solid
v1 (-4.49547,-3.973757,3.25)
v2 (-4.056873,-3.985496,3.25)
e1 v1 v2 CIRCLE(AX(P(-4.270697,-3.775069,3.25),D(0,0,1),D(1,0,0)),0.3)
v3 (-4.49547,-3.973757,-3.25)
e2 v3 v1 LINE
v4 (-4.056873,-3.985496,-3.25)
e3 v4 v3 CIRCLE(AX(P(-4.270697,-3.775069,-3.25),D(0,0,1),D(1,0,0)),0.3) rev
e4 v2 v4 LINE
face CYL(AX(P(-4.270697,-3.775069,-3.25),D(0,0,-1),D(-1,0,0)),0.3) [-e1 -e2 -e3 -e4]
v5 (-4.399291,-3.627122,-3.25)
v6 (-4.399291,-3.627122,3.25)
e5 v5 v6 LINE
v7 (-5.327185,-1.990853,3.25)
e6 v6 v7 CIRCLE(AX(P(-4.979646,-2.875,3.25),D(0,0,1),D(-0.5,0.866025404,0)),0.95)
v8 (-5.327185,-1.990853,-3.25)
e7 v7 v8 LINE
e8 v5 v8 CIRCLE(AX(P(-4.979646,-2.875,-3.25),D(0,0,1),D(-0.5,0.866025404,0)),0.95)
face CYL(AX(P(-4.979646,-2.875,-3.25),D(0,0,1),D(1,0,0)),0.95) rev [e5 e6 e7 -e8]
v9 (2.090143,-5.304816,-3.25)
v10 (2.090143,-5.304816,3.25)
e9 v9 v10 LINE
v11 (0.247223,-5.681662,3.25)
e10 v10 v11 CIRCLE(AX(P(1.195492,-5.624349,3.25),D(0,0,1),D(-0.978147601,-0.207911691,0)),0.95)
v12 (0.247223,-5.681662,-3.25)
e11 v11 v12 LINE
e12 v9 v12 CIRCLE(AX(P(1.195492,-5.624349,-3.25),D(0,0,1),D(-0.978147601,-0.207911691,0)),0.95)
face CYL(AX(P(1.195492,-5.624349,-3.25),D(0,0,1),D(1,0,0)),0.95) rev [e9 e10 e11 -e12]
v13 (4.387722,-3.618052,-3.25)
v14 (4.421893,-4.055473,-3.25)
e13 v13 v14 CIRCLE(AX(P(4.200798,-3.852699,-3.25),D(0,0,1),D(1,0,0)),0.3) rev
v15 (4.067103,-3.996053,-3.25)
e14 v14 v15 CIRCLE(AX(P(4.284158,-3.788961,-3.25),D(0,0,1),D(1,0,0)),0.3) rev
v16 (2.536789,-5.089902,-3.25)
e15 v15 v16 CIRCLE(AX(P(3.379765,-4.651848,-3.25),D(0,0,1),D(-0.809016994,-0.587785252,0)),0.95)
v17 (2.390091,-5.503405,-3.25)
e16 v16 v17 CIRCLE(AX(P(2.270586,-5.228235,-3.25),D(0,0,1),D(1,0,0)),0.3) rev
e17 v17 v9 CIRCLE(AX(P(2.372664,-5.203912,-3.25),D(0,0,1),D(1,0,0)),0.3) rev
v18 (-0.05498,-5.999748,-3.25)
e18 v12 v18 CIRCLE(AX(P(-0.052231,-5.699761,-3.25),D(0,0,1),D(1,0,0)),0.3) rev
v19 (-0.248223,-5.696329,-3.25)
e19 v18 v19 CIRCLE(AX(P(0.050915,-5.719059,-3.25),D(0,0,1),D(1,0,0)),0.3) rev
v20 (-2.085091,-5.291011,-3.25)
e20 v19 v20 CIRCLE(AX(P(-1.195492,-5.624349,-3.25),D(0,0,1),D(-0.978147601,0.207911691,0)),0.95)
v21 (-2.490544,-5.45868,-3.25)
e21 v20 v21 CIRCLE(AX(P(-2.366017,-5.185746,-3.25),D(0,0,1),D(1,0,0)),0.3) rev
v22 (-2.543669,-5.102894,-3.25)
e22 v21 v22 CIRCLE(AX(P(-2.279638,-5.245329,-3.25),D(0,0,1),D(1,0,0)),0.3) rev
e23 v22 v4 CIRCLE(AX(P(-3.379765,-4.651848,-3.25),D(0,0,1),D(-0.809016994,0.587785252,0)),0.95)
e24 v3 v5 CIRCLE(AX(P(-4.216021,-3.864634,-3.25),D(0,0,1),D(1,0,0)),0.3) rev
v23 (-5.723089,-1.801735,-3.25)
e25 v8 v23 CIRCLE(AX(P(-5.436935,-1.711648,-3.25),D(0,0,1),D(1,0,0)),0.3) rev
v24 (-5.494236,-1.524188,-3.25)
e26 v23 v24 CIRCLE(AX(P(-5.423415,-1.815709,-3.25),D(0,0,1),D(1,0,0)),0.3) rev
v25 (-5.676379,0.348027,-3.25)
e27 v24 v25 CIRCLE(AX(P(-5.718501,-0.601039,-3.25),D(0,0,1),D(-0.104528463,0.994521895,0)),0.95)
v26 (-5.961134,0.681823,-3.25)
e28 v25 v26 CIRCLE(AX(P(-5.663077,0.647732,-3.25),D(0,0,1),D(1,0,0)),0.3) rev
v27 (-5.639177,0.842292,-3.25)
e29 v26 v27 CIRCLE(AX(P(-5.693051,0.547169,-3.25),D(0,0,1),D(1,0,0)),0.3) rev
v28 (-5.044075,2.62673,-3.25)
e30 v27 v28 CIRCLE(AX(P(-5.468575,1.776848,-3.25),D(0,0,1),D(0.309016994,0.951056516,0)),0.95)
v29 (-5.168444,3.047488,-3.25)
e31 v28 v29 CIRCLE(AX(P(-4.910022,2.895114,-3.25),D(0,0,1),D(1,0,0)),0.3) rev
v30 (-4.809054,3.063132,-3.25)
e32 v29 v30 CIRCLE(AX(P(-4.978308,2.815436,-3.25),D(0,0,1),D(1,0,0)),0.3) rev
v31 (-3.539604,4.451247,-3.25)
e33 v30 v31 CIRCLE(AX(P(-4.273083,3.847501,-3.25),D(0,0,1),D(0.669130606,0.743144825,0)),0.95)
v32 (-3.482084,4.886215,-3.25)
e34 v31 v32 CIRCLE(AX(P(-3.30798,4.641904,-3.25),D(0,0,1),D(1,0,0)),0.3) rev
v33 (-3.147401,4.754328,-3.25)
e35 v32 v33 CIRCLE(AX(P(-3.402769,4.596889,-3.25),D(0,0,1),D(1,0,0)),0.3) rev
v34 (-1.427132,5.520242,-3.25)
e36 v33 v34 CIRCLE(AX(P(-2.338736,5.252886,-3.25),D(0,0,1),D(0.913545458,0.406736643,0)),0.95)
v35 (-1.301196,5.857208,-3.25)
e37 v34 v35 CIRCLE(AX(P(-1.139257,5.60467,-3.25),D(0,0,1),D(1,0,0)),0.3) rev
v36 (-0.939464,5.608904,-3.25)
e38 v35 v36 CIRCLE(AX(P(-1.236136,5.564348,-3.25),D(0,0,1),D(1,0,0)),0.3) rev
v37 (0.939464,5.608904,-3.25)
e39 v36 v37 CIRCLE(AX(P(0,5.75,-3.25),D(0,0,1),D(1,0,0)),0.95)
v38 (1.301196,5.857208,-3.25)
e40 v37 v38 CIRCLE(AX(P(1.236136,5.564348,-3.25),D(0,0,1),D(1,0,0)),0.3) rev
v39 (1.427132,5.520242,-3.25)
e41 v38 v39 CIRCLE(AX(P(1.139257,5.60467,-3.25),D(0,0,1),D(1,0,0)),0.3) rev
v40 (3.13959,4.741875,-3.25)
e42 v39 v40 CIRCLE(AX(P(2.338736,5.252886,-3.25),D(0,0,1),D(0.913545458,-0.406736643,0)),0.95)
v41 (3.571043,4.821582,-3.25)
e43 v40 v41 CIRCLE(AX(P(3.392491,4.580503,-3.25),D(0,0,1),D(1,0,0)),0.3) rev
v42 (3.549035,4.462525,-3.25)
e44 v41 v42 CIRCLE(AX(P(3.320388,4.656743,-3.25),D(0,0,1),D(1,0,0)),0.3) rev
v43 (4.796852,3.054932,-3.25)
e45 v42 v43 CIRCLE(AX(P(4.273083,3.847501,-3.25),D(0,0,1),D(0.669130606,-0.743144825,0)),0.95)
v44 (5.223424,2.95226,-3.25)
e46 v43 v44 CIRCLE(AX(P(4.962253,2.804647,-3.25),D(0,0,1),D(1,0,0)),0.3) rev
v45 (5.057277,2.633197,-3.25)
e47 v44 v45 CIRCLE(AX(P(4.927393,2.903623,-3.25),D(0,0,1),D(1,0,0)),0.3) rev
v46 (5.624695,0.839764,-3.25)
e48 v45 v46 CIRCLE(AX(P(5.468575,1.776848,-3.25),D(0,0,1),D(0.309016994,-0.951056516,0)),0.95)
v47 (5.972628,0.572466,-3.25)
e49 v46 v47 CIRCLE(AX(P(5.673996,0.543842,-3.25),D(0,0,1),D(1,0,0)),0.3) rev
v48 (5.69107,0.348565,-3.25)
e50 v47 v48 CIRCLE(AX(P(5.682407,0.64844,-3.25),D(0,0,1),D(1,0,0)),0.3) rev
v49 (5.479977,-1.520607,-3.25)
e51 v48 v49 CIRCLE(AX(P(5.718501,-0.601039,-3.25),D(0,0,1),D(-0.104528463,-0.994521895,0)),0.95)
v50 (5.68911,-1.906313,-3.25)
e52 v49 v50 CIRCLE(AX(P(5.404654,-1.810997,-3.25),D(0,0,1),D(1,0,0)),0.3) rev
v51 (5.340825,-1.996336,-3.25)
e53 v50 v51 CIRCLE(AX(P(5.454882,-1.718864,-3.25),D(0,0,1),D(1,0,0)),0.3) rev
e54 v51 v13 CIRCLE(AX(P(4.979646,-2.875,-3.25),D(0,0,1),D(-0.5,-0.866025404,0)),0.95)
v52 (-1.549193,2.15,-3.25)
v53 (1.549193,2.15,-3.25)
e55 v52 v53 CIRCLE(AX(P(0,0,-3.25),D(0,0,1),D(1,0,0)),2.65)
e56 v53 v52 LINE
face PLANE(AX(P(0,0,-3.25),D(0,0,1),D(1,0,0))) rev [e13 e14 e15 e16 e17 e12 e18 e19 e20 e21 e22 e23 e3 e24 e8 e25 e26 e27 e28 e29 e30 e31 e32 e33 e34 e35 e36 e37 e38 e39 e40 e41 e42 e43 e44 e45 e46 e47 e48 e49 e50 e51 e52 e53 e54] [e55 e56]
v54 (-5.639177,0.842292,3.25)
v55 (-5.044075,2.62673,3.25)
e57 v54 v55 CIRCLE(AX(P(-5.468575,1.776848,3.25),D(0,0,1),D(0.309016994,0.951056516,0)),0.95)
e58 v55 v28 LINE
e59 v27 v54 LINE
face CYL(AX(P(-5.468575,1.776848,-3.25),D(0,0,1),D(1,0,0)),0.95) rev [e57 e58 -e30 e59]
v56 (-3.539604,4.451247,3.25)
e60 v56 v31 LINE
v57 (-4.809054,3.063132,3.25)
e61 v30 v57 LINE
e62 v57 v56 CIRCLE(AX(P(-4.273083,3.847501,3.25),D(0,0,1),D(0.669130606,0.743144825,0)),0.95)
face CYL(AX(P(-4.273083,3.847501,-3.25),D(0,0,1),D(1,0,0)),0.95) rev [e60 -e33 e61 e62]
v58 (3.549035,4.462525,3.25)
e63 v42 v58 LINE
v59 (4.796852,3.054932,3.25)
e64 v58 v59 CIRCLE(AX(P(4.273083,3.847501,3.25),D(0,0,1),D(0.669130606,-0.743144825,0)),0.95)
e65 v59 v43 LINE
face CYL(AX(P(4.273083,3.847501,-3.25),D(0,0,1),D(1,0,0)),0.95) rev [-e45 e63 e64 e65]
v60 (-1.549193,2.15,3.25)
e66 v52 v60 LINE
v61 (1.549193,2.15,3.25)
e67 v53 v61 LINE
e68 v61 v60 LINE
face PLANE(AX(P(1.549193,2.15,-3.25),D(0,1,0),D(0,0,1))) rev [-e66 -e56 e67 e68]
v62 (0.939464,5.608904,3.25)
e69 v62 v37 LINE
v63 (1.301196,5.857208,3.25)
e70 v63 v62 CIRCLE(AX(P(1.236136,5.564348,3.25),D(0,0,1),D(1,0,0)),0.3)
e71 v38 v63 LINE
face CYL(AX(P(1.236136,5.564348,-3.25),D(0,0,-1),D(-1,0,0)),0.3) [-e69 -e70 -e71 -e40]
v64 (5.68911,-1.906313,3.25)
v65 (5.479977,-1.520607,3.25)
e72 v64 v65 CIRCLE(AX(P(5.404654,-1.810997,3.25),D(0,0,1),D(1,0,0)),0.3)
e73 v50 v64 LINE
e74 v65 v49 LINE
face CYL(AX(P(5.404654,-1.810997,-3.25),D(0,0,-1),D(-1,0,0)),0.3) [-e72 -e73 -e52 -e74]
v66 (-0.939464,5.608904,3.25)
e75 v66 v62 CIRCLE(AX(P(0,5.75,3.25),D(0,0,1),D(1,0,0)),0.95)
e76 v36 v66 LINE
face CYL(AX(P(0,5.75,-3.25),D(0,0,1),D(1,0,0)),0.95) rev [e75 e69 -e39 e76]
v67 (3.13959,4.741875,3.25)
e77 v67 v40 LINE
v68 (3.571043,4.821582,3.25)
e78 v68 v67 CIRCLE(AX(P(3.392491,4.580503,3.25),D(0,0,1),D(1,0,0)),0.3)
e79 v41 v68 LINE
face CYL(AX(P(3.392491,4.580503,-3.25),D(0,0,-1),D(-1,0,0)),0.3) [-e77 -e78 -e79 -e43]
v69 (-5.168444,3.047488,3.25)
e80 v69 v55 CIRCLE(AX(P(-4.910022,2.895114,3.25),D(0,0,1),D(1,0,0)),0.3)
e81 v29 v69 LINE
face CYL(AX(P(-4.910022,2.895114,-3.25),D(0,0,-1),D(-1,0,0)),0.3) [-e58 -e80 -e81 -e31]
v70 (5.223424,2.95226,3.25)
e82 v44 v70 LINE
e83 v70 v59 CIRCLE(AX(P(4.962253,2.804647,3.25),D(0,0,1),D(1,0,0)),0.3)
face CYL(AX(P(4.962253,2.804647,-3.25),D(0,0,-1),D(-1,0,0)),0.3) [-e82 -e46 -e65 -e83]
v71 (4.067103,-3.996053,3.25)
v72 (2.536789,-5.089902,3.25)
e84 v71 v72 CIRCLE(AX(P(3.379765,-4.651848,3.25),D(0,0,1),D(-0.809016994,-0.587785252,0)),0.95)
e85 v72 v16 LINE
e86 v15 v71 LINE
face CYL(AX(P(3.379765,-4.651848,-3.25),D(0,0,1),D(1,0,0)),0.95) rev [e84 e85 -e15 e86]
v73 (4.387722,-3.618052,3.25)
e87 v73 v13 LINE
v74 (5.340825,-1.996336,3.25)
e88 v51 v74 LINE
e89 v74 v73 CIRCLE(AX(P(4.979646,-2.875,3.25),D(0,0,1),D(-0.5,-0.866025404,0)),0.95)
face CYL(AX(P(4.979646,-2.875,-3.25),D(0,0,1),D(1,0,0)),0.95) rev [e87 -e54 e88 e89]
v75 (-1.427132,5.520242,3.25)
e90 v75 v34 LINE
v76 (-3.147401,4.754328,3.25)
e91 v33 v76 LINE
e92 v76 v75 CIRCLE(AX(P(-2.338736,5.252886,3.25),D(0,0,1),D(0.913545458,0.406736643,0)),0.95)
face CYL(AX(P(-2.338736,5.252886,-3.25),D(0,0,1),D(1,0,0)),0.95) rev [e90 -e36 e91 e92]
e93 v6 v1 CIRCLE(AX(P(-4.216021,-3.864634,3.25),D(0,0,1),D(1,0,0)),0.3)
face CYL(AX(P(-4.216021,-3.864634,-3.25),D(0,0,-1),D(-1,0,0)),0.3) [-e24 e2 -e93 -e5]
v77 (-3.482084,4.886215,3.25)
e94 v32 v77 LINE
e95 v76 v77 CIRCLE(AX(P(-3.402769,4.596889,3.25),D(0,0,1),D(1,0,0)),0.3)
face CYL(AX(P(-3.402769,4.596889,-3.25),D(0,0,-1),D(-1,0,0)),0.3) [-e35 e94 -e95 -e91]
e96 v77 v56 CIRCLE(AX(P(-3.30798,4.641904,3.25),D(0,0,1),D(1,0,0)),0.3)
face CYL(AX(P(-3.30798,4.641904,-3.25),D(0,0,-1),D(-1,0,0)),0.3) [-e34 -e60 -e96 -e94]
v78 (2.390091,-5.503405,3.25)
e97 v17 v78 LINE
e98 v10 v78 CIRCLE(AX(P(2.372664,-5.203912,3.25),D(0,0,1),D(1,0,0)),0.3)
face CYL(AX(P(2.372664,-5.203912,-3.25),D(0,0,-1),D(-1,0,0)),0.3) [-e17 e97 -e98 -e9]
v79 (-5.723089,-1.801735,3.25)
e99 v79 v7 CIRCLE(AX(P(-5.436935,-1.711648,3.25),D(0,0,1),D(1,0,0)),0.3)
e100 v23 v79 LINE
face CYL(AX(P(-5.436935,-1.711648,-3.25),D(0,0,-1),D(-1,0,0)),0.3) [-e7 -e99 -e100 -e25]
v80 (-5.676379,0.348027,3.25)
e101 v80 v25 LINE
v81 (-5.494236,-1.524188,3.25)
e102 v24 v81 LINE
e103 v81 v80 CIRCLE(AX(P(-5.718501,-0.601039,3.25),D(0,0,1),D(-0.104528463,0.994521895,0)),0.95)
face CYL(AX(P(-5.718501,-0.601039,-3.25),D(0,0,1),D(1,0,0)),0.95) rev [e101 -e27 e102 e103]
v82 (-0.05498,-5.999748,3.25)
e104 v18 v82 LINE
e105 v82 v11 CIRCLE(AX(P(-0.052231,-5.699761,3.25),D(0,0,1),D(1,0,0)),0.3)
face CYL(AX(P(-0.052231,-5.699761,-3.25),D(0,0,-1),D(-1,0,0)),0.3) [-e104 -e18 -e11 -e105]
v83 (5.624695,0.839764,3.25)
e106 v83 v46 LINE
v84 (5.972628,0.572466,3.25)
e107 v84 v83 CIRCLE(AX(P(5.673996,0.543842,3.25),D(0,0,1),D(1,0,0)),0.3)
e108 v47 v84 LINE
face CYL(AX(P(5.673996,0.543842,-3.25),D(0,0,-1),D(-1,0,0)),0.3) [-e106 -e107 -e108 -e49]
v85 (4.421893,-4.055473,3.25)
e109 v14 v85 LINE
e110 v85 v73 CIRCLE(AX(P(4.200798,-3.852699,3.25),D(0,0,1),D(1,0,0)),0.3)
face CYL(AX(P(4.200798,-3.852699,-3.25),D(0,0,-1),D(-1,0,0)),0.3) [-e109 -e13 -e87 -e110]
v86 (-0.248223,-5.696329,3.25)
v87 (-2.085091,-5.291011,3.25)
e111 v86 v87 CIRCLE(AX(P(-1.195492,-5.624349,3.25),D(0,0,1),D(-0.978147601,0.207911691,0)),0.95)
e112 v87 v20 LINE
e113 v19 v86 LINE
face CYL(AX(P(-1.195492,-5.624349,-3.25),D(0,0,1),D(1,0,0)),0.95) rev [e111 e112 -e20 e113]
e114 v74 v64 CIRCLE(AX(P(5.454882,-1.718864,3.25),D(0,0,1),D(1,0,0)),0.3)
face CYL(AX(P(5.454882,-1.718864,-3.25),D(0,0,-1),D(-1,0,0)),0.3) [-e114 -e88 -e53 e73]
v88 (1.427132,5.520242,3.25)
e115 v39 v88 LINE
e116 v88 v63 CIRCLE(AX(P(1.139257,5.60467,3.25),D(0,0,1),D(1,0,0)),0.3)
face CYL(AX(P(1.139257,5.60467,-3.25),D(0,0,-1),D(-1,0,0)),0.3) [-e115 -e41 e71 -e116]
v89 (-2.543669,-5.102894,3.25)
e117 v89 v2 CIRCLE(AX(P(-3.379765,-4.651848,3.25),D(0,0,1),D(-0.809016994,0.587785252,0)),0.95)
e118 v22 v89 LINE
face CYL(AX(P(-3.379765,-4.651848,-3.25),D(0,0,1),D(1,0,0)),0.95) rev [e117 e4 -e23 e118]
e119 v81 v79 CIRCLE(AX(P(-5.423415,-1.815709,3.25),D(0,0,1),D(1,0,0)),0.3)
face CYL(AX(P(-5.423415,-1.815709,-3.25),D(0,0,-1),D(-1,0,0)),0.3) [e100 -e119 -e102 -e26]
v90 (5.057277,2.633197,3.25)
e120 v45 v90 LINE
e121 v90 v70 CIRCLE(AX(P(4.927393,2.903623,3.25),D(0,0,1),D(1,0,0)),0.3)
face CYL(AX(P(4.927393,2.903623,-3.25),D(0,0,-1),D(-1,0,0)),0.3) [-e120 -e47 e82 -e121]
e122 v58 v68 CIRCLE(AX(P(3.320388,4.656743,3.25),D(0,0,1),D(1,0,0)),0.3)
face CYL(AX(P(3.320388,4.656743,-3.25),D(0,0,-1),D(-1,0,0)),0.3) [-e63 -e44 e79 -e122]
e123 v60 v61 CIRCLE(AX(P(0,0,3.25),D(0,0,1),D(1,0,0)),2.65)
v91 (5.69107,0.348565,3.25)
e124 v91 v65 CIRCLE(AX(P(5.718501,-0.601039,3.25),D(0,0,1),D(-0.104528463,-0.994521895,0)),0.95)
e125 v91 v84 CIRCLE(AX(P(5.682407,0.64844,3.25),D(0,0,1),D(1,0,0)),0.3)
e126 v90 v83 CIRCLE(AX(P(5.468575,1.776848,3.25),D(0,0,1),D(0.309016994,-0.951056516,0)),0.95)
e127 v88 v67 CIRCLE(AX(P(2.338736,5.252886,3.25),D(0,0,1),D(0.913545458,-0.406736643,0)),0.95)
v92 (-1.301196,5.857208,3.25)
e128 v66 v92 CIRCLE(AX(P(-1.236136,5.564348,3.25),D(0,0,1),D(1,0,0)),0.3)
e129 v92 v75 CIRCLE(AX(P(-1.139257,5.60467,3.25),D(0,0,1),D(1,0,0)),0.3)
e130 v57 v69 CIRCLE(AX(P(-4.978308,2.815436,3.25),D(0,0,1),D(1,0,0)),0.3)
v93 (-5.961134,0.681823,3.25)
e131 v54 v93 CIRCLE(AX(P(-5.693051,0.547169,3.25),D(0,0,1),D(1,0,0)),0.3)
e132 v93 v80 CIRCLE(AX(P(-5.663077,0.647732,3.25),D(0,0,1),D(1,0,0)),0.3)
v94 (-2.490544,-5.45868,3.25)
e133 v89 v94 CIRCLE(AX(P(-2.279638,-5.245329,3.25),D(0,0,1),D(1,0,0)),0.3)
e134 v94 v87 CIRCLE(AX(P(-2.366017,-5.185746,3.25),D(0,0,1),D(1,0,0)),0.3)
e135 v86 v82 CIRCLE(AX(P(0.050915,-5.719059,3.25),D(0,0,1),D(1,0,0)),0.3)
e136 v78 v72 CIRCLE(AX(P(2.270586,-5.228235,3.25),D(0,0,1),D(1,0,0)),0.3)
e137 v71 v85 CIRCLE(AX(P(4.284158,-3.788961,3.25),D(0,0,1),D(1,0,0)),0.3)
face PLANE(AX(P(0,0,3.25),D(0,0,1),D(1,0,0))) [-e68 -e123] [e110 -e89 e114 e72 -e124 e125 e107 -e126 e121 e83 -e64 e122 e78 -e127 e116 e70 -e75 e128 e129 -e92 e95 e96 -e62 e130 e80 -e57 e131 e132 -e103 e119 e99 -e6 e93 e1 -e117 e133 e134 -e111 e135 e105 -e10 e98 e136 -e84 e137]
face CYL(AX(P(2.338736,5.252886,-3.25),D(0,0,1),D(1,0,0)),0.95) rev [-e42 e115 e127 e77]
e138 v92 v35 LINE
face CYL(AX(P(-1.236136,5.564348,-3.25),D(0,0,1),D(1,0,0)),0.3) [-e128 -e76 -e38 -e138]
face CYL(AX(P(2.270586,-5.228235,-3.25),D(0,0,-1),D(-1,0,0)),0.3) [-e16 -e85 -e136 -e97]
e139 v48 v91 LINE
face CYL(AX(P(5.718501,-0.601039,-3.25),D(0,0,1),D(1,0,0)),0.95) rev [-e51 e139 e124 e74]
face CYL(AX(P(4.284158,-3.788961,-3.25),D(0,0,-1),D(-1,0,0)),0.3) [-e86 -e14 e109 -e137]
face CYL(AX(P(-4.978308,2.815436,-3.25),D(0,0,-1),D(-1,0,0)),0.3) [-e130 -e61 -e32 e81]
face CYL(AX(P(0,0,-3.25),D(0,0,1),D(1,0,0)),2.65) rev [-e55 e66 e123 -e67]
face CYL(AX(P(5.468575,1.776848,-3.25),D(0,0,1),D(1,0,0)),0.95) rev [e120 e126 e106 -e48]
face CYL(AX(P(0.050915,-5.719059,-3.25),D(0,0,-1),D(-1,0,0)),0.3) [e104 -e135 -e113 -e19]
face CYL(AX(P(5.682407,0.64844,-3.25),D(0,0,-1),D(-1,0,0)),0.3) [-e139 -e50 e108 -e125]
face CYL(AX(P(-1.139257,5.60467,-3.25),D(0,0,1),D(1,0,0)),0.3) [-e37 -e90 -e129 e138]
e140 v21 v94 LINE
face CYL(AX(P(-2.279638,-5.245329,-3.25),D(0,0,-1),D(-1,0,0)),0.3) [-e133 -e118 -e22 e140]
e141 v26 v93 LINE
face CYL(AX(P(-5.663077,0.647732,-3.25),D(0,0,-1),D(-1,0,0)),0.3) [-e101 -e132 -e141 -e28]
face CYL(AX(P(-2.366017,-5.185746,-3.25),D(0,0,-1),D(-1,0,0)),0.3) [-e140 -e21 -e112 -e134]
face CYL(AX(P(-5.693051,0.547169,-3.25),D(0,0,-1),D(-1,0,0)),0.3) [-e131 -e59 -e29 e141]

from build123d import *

# Parameters (mm, degrees)
SKIZZE1_R                            = 6
AUFSATZ_LINEAR_AUSTRAGEN1_DEPTH      = 3.25
SCHNITT_LINEAR_AUSTRAGEN1_DEPTH      = 10.086390923
VERRUNDUNG2_R                        = 0.3
KREISMUSTER1_START                   = -3.25
KREISMUSTER1_DEPTH                   = 6.5
SCHNITT_LINEAR_AUSTRAGEN2_DEPTH      = 10.068181427
SCHNITT_LINEAR_AUSTRAGEN2_DEPTH_BACK = 10.068181427


# Read off the part's stored shape, not the designer's step: Kreismuster1
with BuildPart() as part:
    # Skizze1 → Aufsatz-Linear austragen1 (new, symmetric)
    with BuildSketch(Plane.XY):
        with Locations(Location((0, 0, 0), (0, 0, 180))):
            Circle(SKIZZE1_R)
    extrude(amount=AUFSATZ_LINEAR_AUSTRAGEN1_DEPTH, both=True)

    # Skizze2 → Schnitt-Linear austragen1 (cut, symmetric)
    with BuildSketch(Plane.XY):
        with BuildLine():
            Line((0.95, 5.75), (0.95, 6))
            Line((0.95, 6), (-0.95, 6))
            Line((-0.95, 6), (-0.95, 5.75))
            ThreePointArc((-0.95, 5.75), (0, 4.8), (0.95, 5.75))
        make_face()
    extrude(amount=SCHNITT_LINEAR_AUSTRAGEN1_DEPTH, both=True, mode=Mode.SUBTRACT)

    # Verrundung2
    verrundung2_edges = [part.edges().sort_by_distance(p)[0] for p in [
        (0.95, 5.924314306, 0),
        (-0.95, 5.924314306, 0),
    ]]
    fillet(verrundung2_edges, radius=VERRUNDUNG2_R)

    # Kreismuster1 outline → Kreismuster1 (cut)
    with BuildSketch(Plane.XY.offset(KREISMUSTER1_START)):
        with BuildLine():
            ThreePointArc((1.301196241, 5.857208238), (1.4202728, 5.709694635), (1.427132072, 5.520241632))
            ThreePointArc((1.427132072, 5.520241632), (1.945632522, 4.388033855), (3.139589709, 4.741874783))
            ThreePointArc((3.139589709, 4.741874783), (3.337990982, 4.875510752), (3.571043132, 4.821581789))
            ThreePointArc((3.571043132, 4.821581789), (2.49054405, 5.458680274), (1.301196241, 5.857208238))
        make_face()
        with BuildLine():
            ThreePointArc((-1.301196241, 5.857208238), (-2.440419859, 5.481272746), (-3.482083764, 4.886214553))
            ThreePointArc((-3.482083764, 4.886214553), (-3.292782023, 4.875999815), (-3.147401255, 4.754328445))
            ThreePointArc((-3.147401255, 4.754328445), (-1.952335887, 4.385018197), (-1.427132072, 5.520241632))
            ThreePointArc((-1.427132072, 5.520241632), (-1.4202728, 5.709694635), (-1.301196241, 5.857208238))
        make_face()
        with BuildLine():
            ThreePointArc((-3.482083764, 4.886214553), (-4.421893009, 4.055473119), (-5.168444311, 3.047488049))
            ThreePointArc((-5.168444311, 3.047488049), (-4.991353857, 3.115152376), (-4.809053712, 3.063131734))
            ThreePointArc((-4.809053712, 3.063131734), (-3.572034677, 3.206383521), (-3.539604337, 4.451247144))
            ThreePointArc((-3.539604337, 4.451247144), (-3.60539033, 4.681233753), (-3.482083764, 4.886214553))
        make_face()
        with BuildLine():
            ThreePointArc((-5.168444311, 3.047488049), (-5.689109795, 1.906313128), (-5.961133882, 0.681823175))
            ThreePointArc((-5.961133882, 0.681823175), (-5.826875264, 0.815666791), (-5.639177093, 0.842291719))
            ThreePointArc((-5.639177093, 0.842291719), (-4.567369724, 1.476299708), (-5.044074785, 2.626729824))
            ThreePointArc((-5.044074785, 2.626729824), (-5.197717262, 2.810075472), (-5.168444311, 3.047488049))
        make_face()
        with BuildLine():
            ThreePointArc((-5.961133882, 0.681823175), (-5.972627813, -0.572465721), (-5.72308925, -1.801735119))
            ThreePointArc((-5.72308925, -1.801735119), (-5.654877001, -1.624854993), (-5.494235524, -1.524188187))
            ThreePointArc((-5.494235524, -1.524188187), (-4.772965052, -0.509049737), (-5.676378878, 0.348027053))
            ThreePointArc((-5.676378878, 0.348027053), (-5.891311659, 0.453029612), (-5.961133882, 0.681823175))
        make_face()
        with BuildLine():
            ThreePointArc((-5.72308925, -1.801735119), (-5.223424224, -2.952260046), (-4.495470494, -3.973757043))
            ThreePointArc((-4.495470494, -3.973757043), (-4.505099133, -3.784424586), (-4.39929072, -3.627122108))
            ThreePointArc((-4.39929072, -3.627122108), (-4.153271361, -2.406379857), (-5.327185496, -1.990852756))
            ThreePointArc((-5.327185496, -1.990852756), (-5.566244749, -1.982349183), (-5.72308925, -1.801735119))
        make_face()
        with BuildLine():
            ThreePointArc((-4.495470494, -3.973757043), (-3.571043132, -4.821581789), (-2.490544049, -5.458680274))
            ThreePointArc((-2.490544049, -5.458680274), (-2.576348697, -5.289632788), (-2.543668584, -5.102893665))
            ThreePointArc((-2.543668584, -5.102893665), (-2.815439322, -3.887625039), (-4.056873345, -3.985496038))
            ThreePointArc((-4.056873345, -3.985496038), (-4.278723555, -4.074961795), (-4.495470494, -3.973757043))
        make_face()
        with BuildLine():
            ThreePointArc((-2.490544049, -5.458680274), (-1.301196241, -5.857208238), (-0.054979913, -5.999748095))
            ThreePointArc((-0.054979913, -5.999748095), (-0.202124166, -5.880215427), (-0.248223041, -5.69632855))
            ThreePointArc((-0.248223041, -5.69632855), (-0.990792245, -4.696664534), (-2.085090937, -5.291010847))
            ThreePointArc((-2.085090937, -5.291010847), (-2.251372186, -5.462976493), (-2.490544049, -5.458680274))
        make_face()
        with BuildLine():
            ThreePointArc((-0.054979913, -5.999748095), (1.193639301, -5.880070171), (2.39009075, -5.503404965))
            ThreePointArc((2.39009075, -5.503404965), (2.20704947, -5.454055398), (2.090142521, -5.304816478))
            ThreePointArc((2.090142521, -5.304816478), (1.005171811, -4.693608063), (0.247222636, -5.681661814))
            ThreePointArc((0.247222636, -5.681661814), (0.165261886, -5.906392926), (-0.054979913, -5.999748095))
        make_face()
        with BuildLine():
            ThreePointArc((2.39009075, -5.503404965), (3.482083764, -4.886214553), (4.421893009, -4.055473119))
            ThreePointArc((4.421893009, -4.055473119), (4.234604202, -4.084839642), (4.067103452, -3.996053445))
            ThreePointArc((4.067103452, -3.996053445), (2.82733253, -3.878984118), (2.53678917, -5.089901837))
            ThreePointArc((2.53678917, -5.089901837), (2.553320677, -5.328540364), (2.39009075, -5.503404965))
        make_face()
        with BuildLine():
            ThreePointArc((4.421893009, -4.055473119), (5.168444311, -3.047488049), (5.689109795, -1.906313128))
            ThreePointArc((5.689109795, -1.906313128), (5.529957397, -2.009318003), (5.340825248, -1.996336468))
            ThreePointArc((5.340825248, -1.996336468), (4.160621768, -2.393648579), (4.38772181, -3.618051592))
            ThreePointArc((4.38772181, -3.618051592), (4.499887126, -3.829334765), (4.421893009, -4.055473119))
        make_face()
        with BuildLine():
            ThreePointArc((5.689109795, -1.906313128), (5.961133882, -0.681823176), (5.972627814, 0.572465721))
            ThreePointArc((5.972627814, 0.572465721), (5.86913072, 0.413632974), (5.691069839, 0.34856522))
            ThreePointArc((5.691069839, 0.34856522), (4.774501705, -0.494429456), (5.479977488, -1.520607358))
            ThreePointArc((5.479977488, -1.520607358), (5.668382211, -1.668002397), (5.689109795, -1.906313128))
        make_face()
        with BuildLine():
            ThreePointArc((5.972627814, 0.572465721), (5.72308925, 1.801735119), (5.223424223, 2.952260047))
            ThreePointArc((5.223424223, 2.952260047), (5.193478023, 2.765063051), (5.057276753, 2.633196816))
            ThreePointArc((5.057276753, 2.633196816), (4.562826922, 1.490281013), (5.624695274, 0.839763703))
            ThreePointArc((5.624695274, 0.839763703), (5.856762517, 0.78174274), (5.972627814, 0.572465721))
        make_face()
        with BuildLine():
            ThreePointArc((5.223424223, 2.952260047), (4.495470494, 3.973757044), (3.571043132, 4.821581789))
            ThreePointArc((3.571043132, 4.821581789), (3.619825794, 4.638388607), (3.549034572, 4.462524759))
            ThreePointArc((3.549034572, 4.462524759), (3.562197912, 3.217308355), (4.796852148, 3.05493199))
            ThreePointArc((4.796852148, 3.05493199), (5.032455375, 3.096317454), (5.223424223, 2.952260047))
        make_face()
    extrude(amount=KREISMUSTER1_DEPTH, mode=Mode.SUBTRACT)

    # Skizze3 → Schnitt-Linear austragen2 (cut, two sides: drawn at the far end of the back side and taken through both)
    with BuildSketch(Plane.XY.offset(-SCHNITT_LINEAR_AUSTRAGEN2_DEPTH_BACK)):
        with BuildLine():
            Line((1.549193338, 2.15), (-1.549193338, 2.15))
            ThreePointArc((-1.549193338, 2.15), (0, -2.65), (1.549193338, 2.15))
        make_face()
    extrude(amount=SCHNITT_LINEAR_AUSTRAGEN2_DEPTH + SCHNITT_LINEAR_AUSTRAGEN2_DEPTH_BACK, mode=Mode.SUBTRACT)


solid = part.part
